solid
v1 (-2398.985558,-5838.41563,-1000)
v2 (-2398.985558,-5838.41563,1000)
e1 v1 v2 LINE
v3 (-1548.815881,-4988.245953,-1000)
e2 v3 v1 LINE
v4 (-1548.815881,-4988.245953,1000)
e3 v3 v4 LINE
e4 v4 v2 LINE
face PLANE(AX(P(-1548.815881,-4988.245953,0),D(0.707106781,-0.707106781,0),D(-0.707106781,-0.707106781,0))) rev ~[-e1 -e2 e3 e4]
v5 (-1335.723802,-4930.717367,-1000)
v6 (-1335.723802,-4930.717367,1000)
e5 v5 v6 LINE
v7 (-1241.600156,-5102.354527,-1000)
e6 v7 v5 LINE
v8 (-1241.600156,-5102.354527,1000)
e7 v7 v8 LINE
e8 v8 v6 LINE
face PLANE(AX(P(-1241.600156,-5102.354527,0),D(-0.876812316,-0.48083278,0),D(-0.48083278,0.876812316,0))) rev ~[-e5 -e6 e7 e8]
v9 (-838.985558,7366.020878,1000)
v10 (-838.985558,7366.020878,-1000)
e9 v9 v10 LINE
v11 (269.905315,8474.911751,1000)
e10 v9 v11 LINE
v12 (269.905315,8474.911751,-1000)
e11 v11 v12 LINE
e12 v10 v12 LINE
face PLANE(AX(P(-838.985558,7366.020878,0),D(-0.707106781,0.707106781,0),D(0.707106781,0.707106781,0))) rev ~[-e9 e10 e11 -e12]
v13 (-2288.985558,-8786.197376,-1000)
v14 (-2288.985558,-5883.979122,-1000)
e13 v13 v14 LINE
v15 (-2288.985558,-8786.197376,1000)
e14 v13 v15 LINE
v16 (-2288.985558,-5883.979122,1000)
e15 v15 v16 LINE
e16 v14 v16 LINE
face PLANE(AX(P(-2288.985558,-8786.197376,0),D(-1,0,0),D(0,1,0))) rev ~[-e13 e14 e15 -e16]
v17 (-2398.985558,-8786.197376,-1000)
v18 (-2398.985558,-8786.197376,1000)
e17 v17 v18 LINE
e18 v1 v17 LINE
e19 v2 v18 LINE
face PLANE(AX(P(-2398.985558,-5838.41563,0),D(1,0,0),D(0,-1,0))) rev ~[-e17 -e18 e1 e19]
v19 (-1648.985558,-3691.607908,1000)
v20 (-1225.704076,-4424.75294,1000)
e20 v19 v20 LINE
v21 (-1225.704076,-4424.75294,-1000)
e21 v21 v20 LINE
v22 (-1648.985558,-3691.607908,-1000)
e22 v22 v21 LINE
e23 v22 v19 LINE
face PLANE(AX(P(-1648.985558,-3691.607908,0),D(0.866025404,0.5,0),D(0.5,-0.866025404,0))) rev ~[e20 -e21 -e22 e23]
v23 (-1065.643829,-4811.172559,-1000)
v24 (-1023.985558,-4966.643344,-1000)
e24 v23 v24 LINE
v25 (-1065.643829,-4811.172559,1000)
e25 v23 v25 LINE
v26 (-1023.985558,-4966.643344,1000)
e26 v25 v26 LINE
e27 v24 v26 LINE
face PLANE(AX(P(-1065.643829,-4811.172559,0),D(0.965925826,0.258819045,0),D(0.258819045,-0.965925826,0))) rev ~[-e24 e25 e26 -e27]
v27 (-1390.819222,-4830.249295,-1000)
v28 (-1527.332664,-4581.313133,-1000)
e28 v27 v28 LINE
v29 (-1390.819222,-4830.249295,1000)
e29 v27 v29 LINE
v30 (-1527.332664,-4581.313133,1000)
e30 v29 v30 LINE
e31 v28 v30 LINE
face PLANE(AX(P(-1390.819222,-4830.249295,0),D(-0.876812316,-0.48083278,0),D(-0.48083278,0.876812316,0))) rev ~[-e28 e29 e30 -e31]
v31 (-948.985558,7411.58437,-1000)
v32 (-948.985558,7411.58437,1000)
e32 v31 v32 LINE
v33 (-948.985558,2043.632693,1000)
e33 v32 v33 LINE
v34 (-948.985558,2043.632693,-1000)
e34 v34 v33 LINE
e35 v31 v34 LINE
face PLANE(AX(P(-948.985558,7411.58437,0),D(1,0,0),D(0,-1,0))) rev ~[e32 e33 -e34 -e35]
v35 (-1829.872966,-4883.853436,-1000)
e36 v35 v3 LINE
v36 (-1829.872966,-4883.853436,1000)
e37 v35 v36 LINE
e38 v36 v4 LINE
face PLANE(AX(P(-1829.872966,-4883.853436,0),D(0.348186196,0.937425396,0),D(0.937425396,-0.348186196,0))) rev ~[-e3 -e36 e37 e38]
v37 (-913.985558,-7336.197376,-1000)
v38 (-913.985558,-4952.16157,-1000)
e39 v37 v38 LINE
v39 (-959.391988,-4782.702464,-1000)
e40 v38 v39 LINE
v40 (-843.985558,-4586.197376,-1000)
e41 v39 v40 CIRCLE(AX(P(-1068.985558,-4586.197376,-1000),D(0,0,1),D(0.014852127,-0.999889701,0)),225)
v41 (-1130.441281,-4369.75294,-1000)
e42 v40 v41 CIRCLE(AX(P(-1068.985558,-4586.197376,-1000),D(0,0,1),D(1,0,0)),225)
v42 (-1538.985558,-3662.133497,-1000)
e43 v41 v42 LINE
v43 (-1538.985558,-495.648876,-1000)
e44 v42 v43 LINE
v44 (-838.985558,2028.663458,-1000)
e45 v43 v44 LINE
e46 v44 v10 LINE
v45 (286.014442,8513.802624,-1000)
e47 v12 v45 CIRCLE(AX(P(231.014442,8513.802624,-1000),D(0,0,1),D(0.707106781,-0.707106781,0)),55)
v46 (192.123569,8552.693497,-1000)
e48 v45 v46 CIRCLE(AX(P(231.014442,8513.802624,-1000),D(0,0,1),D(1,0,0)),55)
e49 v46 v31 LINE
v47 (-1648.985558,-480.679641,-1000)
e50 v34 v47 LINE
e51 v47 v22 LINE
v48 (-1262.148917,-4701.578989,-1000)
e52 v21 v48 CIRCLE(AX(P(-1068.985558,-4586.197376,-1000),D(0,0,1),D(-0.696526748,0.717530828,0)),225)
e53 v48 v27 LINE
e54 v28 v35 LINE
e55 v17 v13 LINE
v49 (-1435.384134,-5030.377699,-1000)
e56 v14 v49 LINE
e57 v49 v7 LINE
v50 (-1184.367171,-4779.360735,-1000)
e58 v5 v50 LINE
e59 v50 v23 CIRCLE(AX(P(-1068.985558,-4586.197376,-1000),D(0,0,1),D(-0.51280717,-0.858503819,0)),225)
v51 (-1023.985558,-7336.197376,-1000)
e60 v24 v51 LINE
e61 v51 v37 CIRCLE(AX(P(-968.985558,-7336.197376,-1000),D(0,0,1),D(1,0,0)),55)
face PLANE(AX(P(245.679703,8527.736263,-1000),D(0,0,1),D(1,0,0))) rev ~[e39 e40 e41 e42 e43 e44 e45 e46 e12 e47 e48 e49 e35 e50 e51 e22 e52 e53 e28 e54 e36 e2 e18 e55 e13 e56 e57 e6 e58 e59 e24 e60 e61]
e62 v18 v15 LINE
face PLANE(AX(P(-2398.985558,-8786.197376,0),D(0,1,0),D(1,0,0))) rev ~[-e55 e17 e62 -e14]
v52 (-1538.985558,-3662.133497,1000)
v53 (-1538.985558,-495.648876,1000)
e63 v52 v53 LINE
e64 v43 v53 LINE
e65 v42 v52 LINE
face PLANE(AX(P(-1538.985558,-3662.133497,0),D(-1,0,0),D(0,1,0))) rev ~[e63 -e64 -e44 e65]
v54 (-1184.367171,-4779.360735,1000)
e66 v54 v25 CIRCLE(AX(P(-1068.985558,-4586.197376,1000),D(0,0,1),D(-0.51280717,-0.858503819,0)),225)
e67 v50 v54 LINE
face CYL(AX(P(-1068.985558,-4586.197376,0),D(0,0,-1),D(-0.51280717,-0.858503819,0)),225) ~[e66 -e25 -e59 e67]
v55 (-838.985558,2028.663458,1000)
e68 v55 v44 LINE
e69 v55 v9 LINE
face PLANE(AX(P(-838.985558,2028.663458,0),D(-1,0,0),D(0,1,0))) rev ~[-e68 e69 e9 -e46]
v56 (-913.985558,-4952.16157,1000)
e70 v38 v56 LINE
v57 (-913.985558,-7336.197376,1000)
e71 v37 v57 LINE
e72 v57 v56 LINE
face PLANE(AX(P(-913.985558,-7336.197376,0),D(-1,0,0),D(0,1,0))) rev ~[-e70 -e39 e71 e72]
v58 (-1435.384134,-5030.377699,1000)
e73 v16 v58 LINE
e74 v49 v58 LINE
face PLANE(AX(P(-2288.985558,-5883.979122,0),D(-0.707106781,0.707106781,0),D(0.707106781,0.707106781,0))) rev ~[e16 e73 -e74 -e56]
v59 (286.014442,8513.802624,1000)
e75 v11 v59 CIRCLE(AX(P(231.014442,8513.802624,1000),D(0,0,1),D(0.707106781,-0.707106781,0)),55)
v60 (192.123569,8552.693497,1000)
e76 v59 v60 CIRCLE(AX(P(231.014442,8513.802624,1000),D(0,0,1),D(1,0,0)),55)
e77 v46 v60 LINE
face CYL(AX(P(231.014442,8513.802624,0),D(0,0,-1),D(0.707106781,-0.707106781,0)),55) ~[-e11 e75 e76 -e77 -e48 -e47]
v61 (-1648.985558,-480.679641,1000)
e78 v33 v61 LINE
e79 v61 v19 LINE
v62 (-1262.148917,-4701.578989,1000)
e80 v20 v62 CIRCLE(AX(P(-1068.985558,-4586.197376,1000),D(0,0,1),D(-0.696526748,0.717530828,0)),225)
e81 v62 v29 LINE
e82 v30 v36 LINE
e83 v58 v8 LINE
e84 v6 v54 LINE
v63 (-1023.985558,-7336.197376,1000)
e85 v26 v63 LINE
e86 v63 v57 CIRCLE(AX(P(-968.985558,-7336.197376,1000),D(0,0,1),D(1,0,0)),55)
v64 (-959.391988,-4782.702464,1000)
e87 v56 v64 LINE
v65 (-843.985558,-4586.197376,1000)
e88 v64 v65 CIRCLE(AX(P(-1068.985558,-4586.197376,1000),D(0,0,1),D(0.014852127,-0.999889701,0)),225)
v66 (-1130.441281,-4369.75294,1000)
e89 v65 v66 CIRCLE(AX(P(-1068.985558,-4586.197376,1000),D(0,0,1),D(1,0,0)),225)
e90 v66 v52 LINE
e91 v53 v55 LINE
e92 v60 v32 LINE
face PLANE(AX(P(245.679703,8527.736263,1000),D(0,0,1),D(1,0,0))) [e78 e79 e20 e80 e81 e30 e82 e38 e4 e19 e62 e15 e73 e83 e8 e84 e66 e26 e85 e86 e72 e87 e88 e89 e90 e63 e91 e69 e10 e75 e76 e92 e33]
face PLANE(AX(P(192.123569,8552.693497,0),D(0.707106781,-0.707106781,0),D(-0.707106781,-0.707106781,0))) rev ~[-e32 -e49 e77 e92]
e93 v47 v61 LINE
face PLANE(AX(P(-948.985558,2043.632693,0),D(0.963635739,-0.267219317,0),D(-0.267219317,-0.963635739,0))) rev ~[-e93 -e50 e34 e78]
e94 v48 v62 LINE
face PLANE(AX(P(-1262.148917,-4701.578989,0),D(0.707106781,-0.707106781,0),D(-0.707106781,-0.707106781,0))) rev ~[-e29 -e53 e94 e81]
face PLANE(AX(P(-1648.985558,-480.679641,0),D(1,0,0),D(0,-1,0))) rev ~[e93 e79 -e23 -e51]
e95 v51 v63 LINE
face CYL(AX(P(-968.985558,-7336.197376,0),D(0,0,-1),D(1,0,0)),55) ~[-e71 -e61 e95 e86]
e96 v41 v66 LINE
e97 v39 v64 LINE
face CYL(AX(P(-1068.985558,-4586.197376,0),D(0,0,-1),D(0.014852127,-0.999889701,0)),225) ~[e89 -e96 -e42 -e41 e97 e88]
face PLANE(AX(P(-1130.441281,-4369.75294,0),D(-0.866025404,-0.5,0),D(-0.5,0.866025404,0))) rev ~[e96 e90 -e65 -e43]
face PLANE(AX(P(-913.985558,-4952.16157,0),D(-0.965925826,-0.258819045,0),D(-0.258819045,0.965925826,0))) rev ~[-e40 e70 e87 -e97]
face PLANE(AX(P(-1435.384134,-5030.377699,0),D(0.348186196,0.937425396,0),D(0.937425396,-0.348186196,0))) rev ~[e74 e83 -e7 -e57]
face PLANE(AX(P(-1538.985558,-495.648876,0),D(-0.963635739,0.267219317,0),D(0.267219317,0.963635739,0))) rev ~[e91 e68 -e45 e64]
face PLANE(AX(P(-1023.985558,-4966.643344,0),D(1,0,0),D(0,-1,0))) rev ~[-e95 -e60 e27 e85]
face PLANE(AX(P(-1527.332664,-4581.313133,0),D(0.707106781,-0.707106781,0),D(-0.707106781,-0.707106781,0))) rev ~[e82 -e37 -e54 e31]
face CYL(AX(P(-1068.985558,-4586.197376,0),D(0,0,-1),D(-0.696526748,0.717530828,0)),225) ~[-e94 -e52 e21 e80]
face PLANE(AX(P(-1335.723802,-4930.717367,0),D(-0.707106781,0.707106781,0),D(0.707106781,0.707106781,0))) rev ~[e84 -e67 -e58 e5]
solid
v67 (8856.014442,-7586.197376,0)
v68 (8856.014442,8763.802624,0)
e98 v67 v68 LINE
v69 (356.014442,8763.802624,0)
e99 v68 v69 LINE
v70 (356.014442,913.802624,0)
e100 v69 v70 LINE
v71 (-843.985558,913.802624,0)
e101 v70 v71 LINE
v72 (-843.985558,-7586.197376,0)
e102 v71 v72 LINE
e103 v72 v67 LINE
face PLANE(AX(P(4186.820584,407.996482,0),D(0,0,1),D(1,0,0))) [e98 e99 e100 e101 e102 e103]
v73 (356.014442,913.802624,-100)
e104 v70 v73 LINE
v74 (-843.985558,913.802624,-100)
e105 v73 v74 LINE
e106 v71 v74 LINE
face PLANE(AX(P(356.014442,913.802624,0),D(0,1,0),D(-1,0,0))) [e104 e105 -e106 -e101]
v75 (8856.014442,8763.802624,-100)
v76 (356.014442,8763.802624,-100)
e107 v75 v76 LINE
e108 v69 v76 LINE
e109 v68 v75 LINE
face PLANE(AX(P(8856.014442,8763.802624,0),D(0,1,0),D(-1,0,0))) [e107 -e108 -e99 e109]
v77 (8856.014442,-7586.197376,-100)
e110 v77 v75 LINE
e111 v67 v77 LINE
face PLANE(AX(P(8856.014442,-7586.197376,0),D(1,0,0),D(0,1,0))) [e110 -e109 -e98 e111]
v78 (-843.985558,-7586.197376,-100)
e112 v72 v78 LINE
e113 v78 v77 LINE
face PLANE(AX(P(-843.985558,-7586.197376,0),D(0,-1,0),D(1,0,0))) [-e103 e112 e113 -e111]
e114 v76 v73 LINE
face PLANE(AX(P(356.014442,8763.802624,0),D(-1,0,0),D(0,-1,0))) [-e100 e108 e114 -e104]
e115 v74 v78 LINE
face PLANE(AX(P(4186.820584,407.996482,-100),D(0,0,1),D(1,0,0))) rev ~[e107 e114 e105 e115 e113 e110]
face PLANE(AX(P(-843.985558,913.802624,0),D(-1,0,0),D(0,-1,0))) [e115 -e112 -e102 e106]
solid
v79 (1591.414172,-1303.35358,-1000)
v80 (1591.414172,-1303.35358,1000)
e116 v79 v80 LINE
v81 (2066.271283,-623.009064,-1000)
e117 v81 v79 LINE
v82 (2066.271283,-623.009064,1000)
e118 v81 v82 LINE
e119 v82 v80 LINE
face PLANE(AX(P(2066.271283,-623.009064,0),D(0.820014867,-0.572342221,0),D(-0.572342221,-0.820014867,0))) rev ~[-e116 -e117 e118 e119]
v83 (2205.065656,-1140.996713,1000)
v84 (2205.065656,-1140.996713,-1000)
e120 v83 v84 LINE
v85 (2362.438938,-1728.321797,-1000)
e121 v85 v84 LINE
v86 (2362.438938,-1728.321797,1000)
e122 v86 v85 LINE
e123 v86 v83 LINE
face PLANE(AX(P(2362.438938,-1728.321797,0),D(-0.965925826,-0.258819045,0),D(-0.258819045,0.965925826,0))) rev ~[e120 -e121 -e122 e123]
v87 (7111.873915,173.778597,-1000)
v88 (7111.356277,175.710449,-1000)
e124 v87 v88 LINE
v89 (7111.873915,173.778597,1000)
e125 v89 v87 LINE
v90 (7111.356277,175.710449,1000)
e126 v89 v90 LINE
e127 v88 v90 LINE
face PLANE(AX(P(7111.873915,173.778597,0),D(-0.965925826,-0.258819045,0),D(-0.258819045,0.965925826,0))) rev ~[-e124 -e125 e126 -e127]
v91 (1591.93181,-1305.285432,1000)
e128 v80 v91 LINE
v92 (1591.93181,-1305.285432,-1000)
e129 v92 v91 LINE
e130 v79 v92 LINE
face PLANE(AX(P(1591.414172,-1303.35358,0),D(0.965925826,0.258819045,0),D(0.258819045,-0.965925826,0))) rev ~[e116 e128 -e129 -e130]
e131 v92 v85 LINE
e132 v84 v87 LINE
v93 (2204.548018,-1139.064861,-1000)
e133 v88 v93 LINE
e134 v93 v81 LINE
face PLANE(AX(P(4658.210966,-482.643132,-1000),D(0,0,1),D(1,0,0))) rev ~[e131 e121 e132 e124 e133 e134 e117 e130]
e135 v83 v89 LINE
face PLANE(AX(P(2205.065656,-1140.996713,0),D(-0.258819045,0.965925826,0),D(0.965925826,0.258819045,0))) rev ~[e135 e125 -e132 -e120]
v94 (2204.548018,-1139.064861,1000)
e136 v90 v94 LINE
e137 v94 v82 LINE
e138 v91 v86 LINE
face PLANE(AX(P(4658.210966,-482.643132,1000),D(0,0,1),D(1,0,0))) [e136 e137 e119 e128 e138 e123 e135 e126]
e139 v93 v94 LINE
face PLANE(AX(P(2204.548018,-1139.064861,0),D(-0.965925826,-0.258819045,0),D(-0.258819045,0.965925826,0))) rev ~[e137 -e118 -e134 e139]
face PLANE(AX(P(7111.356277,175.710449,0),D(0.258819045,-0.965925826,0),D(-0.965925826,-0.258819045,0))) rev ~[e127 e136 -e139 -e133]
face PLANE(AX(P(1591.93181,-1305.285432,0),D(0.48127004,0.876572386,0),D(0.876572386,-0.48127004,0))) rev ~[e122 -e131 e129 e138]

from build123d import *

# Parameters (mm, degrees)
F1_DEPTH      = 100
F3_DEPTH      = 1000
F3_DEPTH_BACK = 1000


# Not quite as in the source:
# - a feature names something its author has since deleted; it is built from what else it names


with BuildPart() as f1:
    # F0 (on Top) → F1 (new body)
    with BuildSketch(Plane.XY):
        Polygon((-843.9855575562, 913.8026237488), (-843.9855575561, -7586.1973762512), (8856.0144424439, -7586.1973762512), (8856.0144424438, 8763.8026237488), (356.0144424438, 8763.8026237488), (356.0144424438, 913.8026237488), align=None)
    extrude(amount=-F1_DEPTH)


with BuildPart() as f3:
    # F2 (on Top) → F3 (new body, two sides)
    with BuildSketch(Plane.XY) as f3_sk:
        with BuildLine():
            ThreePointArc((269.9053154091, 8474.9117507835), (281.827816732, 8492.7550349687), (286.0144424438, 8513.8026237488))
            ThreePointArc((286.0144424438, 8513.8026237488), (252.0620312239, 8564.6159980369), (192.1235694786, 8552.693496714))
            Line((192.1235694786, 8552.693496714), (269.9053154091, 8474.9117507835))
        make_face()
        with BuildLine():
            Line((269.9053154091, 8474.9117507835), (192.1235694786, 8552.693496714))
            ThreePointArc((192.1235694786, 8552.693496714), (192.1235694786, 8474.9117507835), (269.9053154091, 8474.9117507835))
        make_face()
        with BuildLine():
            ThreePointArc((269.9053154091, 8474.9117507835), (192.1235694786, 8474.9117507835), (192.1235694786, 8552.693496714))
            Line((192.1235694786, 8552.693496714), (-948.9855575562, 7411.5843696793))
            Line((-948.9855575562, 7411.5843696793), (-948.9855575562, 2043.63269294))
            Line((-948.9855575562, 2043.63269294), (-1648.9855575562, -480.6796410505))
            Line((-1648.9855575562, -480.6796410505), (-1648.9855575562, -3691.6079078613))
            Line((-1648.9855575562, -3691.6079078613), (-1225.7040759107, -4424.7529399743))
            ThreePointArc((-1225.7040759107, -4424.7529399743), (-1181.4855575561, -4391.3416603997), (-1130.4412814944, -4369.7529399743))
            Line((-1130.4412814944, -4369.7529399743), (-1538.9855575562, -3662.1334966938))
            Line((-1538.9855575562, -3662.1334966938), (-1538.9855575562, -495.6488760565))
            Line((-1538.9855575562, -495.6488760565), (-838.9855575562, 2028.663457934))
            Line((-838.9855575562, 2028.663457934), (-838.9855575562, 7366.0208778183))
            Line((-838.9855575562, 7366.0208778183), (269.9053154091, 8474.9117507835))
        make_face()
        with BuildLine():
            ThreePointArc((-1130.4412814944, -4369.7529399743), (-1181.4855575561, -4391.3416603997), (-1225.7040759107, -4424.7529399743))
            ThreePointArc((-1225.7040759107, -4424.7529399743), (-1292.0606513653, -4556.8289830017), (-1262.1489167268, -4701.5789894914))
            ThreePointArc((-1262.1489167268, -4701.5789894914), (-1228.0845833231, -4745.2964020182), (-1184.3671707963, -4779.3607354219))
            ThreePointArc((-1184.3671707963, -4779.3607354219), (-1127.2198427042, -4803.5306871663), (-1065.6438289459, -4811.1725589934))
            ThreePointArc((-1065.6438289459, -4811.1725589934), (-1010.7512724081, -4803.5306871663), (-959.3919880541, -4782.7024640322))
            ThreePointArc((-959.3919880541, -4782.7024640322), (-874.970670063, -4700.1413248883), (-843.9855575562, -4586.1973762512))
            ThreePointArc((-843.9855575562, -4586.1973762512), (-933.3436353604, -4406.6806111761), (-1130.4412814944, -4369.7529399743))
        make_face()
        with BuildLine():
            ThreePointArc((-1184.3671707963, -4779.3607354219), (-1228.0845833231, -4745.2964020182), (-1262.1489167268, -4701.5789894914))
            Line((-1262.1489167268, -4701.5789894914), (-1390.8192221094, -4830.249294874))
            Line((-1390.8192221094, -4830.249294874), (-1335.7238024601, -4930.7173670857))
            Line((-1335.7238024601, -4930.7173670857), (-1184.3671707963, -4779.3607354219))
        make_face()
        Polygon((-1335.7238024601, -4930.7173670857), (-1390.8192221094, -4830.249294874), (-1548.8158805226, -4988.2459532871), (-1435.3841341858, -5030.3776988114), align=None)
        Polygon((-1548.8158805226, -4988.2459532871), (-1390.8192221094, -4830.249294874), (-1527.3326635361, -4581.3131332397), (-1829.8729658127, -4883.8534355164), align=None)
        with BuildLine():
            Line((-913.9855575561, -4952.1615696408), (-959.3919880541, -4782.7024640322))
            ThreePointArc((-959.3919880541, -4782.7024640322), (-1010.7512724081, -4803.5306871663), (-1065.6438289459, -4811.1725589934))
            Line((-1065.6438289459, -4811.1725589934), (-1023.9855575561, -4966.6433443754))
            Line((-1023.9855575561, -4966.6433443754), (-1023.9855575561, -7336.1973762512))
            ThreePointArc((-1023.9855575561, -7336.1973762512), (-968.9855575561, -7281.1973762512), (-913.9855575561, -7336.1973762512))
            Line((-913.9855575561, -7336.1973762512), (-913.9855575561, -4952.1615696408))
        make_face()
        Polygon((-1241.6001558304, -5102.3545265198), (-1335.7238024601, -4930.7173670857), (-1435.3841341858, -5030.3776988114), align=None)
        Polygon((-1435.3841341858, -5030.3776988114), (-1548.8158805226, -4988.2459532871), (-2398.9855575561, -5838.4156303207), (-2398.9855575561, -8786.1973762512), (-2288.9855575561, -8786.1973762512), (-2288.9855575561, -5883.9791221817), align=None)
        with BuildLine():
            ThreePointArc((-1023.9855575561, -7336.1973762512), (-968.9855575561, -7391.1973762512), (-913.9855575561, -7336.1973762512))
            ThreePointArc((-913.9855575561, -7336.1973762512), (-968.9855575561, -7281.1973762512), (-1023.9855575561, -7336.1973762512))
        make_face()
    extrude(amount=-F3_DEPTH)
    extrude(f3_sk.sketch, amount=F3_DEPTH_BACK)


with BuildPart() as f3b:
    # F2 (on Top) → F3, piece 2 (new body, two sides)
    with BuildSketch(Plane.XY) as f3_2_sk:
        Polygon((7111.8739150801, 173.7785974403), (7111.3562769899, 175.7104490929), (2204.5480176534, -1139.0648614107), (2205.0656557436, -1140.9967130633), align=None)
        Polygon((2205.0656557436, -1140.9967130633), (2204.5480176534, -1139.0648614107), (1591.4141720975, -1303.3535801796), (1591.9318101877, -1305.2854318322), align=None)
        Polygon((1591.4141720975, -1303.3535801796), (2204.5480176534, -1139.0648614107), (2066.2712834871, -623.0090639974), align=None)
        Polygon((2362.4389377281, -1728.3217971832), (2205.0656557436, -1140.9967130633), (1591.9318101877, -1305.2854318322), align=None)
    extrude(amount=-F3_DEPTH)
    extrude(f3_2_sk.sketch, amount=F3_DEPTH_BACK)


solid = Compound([f1.part, f3.part, f3b.part])
